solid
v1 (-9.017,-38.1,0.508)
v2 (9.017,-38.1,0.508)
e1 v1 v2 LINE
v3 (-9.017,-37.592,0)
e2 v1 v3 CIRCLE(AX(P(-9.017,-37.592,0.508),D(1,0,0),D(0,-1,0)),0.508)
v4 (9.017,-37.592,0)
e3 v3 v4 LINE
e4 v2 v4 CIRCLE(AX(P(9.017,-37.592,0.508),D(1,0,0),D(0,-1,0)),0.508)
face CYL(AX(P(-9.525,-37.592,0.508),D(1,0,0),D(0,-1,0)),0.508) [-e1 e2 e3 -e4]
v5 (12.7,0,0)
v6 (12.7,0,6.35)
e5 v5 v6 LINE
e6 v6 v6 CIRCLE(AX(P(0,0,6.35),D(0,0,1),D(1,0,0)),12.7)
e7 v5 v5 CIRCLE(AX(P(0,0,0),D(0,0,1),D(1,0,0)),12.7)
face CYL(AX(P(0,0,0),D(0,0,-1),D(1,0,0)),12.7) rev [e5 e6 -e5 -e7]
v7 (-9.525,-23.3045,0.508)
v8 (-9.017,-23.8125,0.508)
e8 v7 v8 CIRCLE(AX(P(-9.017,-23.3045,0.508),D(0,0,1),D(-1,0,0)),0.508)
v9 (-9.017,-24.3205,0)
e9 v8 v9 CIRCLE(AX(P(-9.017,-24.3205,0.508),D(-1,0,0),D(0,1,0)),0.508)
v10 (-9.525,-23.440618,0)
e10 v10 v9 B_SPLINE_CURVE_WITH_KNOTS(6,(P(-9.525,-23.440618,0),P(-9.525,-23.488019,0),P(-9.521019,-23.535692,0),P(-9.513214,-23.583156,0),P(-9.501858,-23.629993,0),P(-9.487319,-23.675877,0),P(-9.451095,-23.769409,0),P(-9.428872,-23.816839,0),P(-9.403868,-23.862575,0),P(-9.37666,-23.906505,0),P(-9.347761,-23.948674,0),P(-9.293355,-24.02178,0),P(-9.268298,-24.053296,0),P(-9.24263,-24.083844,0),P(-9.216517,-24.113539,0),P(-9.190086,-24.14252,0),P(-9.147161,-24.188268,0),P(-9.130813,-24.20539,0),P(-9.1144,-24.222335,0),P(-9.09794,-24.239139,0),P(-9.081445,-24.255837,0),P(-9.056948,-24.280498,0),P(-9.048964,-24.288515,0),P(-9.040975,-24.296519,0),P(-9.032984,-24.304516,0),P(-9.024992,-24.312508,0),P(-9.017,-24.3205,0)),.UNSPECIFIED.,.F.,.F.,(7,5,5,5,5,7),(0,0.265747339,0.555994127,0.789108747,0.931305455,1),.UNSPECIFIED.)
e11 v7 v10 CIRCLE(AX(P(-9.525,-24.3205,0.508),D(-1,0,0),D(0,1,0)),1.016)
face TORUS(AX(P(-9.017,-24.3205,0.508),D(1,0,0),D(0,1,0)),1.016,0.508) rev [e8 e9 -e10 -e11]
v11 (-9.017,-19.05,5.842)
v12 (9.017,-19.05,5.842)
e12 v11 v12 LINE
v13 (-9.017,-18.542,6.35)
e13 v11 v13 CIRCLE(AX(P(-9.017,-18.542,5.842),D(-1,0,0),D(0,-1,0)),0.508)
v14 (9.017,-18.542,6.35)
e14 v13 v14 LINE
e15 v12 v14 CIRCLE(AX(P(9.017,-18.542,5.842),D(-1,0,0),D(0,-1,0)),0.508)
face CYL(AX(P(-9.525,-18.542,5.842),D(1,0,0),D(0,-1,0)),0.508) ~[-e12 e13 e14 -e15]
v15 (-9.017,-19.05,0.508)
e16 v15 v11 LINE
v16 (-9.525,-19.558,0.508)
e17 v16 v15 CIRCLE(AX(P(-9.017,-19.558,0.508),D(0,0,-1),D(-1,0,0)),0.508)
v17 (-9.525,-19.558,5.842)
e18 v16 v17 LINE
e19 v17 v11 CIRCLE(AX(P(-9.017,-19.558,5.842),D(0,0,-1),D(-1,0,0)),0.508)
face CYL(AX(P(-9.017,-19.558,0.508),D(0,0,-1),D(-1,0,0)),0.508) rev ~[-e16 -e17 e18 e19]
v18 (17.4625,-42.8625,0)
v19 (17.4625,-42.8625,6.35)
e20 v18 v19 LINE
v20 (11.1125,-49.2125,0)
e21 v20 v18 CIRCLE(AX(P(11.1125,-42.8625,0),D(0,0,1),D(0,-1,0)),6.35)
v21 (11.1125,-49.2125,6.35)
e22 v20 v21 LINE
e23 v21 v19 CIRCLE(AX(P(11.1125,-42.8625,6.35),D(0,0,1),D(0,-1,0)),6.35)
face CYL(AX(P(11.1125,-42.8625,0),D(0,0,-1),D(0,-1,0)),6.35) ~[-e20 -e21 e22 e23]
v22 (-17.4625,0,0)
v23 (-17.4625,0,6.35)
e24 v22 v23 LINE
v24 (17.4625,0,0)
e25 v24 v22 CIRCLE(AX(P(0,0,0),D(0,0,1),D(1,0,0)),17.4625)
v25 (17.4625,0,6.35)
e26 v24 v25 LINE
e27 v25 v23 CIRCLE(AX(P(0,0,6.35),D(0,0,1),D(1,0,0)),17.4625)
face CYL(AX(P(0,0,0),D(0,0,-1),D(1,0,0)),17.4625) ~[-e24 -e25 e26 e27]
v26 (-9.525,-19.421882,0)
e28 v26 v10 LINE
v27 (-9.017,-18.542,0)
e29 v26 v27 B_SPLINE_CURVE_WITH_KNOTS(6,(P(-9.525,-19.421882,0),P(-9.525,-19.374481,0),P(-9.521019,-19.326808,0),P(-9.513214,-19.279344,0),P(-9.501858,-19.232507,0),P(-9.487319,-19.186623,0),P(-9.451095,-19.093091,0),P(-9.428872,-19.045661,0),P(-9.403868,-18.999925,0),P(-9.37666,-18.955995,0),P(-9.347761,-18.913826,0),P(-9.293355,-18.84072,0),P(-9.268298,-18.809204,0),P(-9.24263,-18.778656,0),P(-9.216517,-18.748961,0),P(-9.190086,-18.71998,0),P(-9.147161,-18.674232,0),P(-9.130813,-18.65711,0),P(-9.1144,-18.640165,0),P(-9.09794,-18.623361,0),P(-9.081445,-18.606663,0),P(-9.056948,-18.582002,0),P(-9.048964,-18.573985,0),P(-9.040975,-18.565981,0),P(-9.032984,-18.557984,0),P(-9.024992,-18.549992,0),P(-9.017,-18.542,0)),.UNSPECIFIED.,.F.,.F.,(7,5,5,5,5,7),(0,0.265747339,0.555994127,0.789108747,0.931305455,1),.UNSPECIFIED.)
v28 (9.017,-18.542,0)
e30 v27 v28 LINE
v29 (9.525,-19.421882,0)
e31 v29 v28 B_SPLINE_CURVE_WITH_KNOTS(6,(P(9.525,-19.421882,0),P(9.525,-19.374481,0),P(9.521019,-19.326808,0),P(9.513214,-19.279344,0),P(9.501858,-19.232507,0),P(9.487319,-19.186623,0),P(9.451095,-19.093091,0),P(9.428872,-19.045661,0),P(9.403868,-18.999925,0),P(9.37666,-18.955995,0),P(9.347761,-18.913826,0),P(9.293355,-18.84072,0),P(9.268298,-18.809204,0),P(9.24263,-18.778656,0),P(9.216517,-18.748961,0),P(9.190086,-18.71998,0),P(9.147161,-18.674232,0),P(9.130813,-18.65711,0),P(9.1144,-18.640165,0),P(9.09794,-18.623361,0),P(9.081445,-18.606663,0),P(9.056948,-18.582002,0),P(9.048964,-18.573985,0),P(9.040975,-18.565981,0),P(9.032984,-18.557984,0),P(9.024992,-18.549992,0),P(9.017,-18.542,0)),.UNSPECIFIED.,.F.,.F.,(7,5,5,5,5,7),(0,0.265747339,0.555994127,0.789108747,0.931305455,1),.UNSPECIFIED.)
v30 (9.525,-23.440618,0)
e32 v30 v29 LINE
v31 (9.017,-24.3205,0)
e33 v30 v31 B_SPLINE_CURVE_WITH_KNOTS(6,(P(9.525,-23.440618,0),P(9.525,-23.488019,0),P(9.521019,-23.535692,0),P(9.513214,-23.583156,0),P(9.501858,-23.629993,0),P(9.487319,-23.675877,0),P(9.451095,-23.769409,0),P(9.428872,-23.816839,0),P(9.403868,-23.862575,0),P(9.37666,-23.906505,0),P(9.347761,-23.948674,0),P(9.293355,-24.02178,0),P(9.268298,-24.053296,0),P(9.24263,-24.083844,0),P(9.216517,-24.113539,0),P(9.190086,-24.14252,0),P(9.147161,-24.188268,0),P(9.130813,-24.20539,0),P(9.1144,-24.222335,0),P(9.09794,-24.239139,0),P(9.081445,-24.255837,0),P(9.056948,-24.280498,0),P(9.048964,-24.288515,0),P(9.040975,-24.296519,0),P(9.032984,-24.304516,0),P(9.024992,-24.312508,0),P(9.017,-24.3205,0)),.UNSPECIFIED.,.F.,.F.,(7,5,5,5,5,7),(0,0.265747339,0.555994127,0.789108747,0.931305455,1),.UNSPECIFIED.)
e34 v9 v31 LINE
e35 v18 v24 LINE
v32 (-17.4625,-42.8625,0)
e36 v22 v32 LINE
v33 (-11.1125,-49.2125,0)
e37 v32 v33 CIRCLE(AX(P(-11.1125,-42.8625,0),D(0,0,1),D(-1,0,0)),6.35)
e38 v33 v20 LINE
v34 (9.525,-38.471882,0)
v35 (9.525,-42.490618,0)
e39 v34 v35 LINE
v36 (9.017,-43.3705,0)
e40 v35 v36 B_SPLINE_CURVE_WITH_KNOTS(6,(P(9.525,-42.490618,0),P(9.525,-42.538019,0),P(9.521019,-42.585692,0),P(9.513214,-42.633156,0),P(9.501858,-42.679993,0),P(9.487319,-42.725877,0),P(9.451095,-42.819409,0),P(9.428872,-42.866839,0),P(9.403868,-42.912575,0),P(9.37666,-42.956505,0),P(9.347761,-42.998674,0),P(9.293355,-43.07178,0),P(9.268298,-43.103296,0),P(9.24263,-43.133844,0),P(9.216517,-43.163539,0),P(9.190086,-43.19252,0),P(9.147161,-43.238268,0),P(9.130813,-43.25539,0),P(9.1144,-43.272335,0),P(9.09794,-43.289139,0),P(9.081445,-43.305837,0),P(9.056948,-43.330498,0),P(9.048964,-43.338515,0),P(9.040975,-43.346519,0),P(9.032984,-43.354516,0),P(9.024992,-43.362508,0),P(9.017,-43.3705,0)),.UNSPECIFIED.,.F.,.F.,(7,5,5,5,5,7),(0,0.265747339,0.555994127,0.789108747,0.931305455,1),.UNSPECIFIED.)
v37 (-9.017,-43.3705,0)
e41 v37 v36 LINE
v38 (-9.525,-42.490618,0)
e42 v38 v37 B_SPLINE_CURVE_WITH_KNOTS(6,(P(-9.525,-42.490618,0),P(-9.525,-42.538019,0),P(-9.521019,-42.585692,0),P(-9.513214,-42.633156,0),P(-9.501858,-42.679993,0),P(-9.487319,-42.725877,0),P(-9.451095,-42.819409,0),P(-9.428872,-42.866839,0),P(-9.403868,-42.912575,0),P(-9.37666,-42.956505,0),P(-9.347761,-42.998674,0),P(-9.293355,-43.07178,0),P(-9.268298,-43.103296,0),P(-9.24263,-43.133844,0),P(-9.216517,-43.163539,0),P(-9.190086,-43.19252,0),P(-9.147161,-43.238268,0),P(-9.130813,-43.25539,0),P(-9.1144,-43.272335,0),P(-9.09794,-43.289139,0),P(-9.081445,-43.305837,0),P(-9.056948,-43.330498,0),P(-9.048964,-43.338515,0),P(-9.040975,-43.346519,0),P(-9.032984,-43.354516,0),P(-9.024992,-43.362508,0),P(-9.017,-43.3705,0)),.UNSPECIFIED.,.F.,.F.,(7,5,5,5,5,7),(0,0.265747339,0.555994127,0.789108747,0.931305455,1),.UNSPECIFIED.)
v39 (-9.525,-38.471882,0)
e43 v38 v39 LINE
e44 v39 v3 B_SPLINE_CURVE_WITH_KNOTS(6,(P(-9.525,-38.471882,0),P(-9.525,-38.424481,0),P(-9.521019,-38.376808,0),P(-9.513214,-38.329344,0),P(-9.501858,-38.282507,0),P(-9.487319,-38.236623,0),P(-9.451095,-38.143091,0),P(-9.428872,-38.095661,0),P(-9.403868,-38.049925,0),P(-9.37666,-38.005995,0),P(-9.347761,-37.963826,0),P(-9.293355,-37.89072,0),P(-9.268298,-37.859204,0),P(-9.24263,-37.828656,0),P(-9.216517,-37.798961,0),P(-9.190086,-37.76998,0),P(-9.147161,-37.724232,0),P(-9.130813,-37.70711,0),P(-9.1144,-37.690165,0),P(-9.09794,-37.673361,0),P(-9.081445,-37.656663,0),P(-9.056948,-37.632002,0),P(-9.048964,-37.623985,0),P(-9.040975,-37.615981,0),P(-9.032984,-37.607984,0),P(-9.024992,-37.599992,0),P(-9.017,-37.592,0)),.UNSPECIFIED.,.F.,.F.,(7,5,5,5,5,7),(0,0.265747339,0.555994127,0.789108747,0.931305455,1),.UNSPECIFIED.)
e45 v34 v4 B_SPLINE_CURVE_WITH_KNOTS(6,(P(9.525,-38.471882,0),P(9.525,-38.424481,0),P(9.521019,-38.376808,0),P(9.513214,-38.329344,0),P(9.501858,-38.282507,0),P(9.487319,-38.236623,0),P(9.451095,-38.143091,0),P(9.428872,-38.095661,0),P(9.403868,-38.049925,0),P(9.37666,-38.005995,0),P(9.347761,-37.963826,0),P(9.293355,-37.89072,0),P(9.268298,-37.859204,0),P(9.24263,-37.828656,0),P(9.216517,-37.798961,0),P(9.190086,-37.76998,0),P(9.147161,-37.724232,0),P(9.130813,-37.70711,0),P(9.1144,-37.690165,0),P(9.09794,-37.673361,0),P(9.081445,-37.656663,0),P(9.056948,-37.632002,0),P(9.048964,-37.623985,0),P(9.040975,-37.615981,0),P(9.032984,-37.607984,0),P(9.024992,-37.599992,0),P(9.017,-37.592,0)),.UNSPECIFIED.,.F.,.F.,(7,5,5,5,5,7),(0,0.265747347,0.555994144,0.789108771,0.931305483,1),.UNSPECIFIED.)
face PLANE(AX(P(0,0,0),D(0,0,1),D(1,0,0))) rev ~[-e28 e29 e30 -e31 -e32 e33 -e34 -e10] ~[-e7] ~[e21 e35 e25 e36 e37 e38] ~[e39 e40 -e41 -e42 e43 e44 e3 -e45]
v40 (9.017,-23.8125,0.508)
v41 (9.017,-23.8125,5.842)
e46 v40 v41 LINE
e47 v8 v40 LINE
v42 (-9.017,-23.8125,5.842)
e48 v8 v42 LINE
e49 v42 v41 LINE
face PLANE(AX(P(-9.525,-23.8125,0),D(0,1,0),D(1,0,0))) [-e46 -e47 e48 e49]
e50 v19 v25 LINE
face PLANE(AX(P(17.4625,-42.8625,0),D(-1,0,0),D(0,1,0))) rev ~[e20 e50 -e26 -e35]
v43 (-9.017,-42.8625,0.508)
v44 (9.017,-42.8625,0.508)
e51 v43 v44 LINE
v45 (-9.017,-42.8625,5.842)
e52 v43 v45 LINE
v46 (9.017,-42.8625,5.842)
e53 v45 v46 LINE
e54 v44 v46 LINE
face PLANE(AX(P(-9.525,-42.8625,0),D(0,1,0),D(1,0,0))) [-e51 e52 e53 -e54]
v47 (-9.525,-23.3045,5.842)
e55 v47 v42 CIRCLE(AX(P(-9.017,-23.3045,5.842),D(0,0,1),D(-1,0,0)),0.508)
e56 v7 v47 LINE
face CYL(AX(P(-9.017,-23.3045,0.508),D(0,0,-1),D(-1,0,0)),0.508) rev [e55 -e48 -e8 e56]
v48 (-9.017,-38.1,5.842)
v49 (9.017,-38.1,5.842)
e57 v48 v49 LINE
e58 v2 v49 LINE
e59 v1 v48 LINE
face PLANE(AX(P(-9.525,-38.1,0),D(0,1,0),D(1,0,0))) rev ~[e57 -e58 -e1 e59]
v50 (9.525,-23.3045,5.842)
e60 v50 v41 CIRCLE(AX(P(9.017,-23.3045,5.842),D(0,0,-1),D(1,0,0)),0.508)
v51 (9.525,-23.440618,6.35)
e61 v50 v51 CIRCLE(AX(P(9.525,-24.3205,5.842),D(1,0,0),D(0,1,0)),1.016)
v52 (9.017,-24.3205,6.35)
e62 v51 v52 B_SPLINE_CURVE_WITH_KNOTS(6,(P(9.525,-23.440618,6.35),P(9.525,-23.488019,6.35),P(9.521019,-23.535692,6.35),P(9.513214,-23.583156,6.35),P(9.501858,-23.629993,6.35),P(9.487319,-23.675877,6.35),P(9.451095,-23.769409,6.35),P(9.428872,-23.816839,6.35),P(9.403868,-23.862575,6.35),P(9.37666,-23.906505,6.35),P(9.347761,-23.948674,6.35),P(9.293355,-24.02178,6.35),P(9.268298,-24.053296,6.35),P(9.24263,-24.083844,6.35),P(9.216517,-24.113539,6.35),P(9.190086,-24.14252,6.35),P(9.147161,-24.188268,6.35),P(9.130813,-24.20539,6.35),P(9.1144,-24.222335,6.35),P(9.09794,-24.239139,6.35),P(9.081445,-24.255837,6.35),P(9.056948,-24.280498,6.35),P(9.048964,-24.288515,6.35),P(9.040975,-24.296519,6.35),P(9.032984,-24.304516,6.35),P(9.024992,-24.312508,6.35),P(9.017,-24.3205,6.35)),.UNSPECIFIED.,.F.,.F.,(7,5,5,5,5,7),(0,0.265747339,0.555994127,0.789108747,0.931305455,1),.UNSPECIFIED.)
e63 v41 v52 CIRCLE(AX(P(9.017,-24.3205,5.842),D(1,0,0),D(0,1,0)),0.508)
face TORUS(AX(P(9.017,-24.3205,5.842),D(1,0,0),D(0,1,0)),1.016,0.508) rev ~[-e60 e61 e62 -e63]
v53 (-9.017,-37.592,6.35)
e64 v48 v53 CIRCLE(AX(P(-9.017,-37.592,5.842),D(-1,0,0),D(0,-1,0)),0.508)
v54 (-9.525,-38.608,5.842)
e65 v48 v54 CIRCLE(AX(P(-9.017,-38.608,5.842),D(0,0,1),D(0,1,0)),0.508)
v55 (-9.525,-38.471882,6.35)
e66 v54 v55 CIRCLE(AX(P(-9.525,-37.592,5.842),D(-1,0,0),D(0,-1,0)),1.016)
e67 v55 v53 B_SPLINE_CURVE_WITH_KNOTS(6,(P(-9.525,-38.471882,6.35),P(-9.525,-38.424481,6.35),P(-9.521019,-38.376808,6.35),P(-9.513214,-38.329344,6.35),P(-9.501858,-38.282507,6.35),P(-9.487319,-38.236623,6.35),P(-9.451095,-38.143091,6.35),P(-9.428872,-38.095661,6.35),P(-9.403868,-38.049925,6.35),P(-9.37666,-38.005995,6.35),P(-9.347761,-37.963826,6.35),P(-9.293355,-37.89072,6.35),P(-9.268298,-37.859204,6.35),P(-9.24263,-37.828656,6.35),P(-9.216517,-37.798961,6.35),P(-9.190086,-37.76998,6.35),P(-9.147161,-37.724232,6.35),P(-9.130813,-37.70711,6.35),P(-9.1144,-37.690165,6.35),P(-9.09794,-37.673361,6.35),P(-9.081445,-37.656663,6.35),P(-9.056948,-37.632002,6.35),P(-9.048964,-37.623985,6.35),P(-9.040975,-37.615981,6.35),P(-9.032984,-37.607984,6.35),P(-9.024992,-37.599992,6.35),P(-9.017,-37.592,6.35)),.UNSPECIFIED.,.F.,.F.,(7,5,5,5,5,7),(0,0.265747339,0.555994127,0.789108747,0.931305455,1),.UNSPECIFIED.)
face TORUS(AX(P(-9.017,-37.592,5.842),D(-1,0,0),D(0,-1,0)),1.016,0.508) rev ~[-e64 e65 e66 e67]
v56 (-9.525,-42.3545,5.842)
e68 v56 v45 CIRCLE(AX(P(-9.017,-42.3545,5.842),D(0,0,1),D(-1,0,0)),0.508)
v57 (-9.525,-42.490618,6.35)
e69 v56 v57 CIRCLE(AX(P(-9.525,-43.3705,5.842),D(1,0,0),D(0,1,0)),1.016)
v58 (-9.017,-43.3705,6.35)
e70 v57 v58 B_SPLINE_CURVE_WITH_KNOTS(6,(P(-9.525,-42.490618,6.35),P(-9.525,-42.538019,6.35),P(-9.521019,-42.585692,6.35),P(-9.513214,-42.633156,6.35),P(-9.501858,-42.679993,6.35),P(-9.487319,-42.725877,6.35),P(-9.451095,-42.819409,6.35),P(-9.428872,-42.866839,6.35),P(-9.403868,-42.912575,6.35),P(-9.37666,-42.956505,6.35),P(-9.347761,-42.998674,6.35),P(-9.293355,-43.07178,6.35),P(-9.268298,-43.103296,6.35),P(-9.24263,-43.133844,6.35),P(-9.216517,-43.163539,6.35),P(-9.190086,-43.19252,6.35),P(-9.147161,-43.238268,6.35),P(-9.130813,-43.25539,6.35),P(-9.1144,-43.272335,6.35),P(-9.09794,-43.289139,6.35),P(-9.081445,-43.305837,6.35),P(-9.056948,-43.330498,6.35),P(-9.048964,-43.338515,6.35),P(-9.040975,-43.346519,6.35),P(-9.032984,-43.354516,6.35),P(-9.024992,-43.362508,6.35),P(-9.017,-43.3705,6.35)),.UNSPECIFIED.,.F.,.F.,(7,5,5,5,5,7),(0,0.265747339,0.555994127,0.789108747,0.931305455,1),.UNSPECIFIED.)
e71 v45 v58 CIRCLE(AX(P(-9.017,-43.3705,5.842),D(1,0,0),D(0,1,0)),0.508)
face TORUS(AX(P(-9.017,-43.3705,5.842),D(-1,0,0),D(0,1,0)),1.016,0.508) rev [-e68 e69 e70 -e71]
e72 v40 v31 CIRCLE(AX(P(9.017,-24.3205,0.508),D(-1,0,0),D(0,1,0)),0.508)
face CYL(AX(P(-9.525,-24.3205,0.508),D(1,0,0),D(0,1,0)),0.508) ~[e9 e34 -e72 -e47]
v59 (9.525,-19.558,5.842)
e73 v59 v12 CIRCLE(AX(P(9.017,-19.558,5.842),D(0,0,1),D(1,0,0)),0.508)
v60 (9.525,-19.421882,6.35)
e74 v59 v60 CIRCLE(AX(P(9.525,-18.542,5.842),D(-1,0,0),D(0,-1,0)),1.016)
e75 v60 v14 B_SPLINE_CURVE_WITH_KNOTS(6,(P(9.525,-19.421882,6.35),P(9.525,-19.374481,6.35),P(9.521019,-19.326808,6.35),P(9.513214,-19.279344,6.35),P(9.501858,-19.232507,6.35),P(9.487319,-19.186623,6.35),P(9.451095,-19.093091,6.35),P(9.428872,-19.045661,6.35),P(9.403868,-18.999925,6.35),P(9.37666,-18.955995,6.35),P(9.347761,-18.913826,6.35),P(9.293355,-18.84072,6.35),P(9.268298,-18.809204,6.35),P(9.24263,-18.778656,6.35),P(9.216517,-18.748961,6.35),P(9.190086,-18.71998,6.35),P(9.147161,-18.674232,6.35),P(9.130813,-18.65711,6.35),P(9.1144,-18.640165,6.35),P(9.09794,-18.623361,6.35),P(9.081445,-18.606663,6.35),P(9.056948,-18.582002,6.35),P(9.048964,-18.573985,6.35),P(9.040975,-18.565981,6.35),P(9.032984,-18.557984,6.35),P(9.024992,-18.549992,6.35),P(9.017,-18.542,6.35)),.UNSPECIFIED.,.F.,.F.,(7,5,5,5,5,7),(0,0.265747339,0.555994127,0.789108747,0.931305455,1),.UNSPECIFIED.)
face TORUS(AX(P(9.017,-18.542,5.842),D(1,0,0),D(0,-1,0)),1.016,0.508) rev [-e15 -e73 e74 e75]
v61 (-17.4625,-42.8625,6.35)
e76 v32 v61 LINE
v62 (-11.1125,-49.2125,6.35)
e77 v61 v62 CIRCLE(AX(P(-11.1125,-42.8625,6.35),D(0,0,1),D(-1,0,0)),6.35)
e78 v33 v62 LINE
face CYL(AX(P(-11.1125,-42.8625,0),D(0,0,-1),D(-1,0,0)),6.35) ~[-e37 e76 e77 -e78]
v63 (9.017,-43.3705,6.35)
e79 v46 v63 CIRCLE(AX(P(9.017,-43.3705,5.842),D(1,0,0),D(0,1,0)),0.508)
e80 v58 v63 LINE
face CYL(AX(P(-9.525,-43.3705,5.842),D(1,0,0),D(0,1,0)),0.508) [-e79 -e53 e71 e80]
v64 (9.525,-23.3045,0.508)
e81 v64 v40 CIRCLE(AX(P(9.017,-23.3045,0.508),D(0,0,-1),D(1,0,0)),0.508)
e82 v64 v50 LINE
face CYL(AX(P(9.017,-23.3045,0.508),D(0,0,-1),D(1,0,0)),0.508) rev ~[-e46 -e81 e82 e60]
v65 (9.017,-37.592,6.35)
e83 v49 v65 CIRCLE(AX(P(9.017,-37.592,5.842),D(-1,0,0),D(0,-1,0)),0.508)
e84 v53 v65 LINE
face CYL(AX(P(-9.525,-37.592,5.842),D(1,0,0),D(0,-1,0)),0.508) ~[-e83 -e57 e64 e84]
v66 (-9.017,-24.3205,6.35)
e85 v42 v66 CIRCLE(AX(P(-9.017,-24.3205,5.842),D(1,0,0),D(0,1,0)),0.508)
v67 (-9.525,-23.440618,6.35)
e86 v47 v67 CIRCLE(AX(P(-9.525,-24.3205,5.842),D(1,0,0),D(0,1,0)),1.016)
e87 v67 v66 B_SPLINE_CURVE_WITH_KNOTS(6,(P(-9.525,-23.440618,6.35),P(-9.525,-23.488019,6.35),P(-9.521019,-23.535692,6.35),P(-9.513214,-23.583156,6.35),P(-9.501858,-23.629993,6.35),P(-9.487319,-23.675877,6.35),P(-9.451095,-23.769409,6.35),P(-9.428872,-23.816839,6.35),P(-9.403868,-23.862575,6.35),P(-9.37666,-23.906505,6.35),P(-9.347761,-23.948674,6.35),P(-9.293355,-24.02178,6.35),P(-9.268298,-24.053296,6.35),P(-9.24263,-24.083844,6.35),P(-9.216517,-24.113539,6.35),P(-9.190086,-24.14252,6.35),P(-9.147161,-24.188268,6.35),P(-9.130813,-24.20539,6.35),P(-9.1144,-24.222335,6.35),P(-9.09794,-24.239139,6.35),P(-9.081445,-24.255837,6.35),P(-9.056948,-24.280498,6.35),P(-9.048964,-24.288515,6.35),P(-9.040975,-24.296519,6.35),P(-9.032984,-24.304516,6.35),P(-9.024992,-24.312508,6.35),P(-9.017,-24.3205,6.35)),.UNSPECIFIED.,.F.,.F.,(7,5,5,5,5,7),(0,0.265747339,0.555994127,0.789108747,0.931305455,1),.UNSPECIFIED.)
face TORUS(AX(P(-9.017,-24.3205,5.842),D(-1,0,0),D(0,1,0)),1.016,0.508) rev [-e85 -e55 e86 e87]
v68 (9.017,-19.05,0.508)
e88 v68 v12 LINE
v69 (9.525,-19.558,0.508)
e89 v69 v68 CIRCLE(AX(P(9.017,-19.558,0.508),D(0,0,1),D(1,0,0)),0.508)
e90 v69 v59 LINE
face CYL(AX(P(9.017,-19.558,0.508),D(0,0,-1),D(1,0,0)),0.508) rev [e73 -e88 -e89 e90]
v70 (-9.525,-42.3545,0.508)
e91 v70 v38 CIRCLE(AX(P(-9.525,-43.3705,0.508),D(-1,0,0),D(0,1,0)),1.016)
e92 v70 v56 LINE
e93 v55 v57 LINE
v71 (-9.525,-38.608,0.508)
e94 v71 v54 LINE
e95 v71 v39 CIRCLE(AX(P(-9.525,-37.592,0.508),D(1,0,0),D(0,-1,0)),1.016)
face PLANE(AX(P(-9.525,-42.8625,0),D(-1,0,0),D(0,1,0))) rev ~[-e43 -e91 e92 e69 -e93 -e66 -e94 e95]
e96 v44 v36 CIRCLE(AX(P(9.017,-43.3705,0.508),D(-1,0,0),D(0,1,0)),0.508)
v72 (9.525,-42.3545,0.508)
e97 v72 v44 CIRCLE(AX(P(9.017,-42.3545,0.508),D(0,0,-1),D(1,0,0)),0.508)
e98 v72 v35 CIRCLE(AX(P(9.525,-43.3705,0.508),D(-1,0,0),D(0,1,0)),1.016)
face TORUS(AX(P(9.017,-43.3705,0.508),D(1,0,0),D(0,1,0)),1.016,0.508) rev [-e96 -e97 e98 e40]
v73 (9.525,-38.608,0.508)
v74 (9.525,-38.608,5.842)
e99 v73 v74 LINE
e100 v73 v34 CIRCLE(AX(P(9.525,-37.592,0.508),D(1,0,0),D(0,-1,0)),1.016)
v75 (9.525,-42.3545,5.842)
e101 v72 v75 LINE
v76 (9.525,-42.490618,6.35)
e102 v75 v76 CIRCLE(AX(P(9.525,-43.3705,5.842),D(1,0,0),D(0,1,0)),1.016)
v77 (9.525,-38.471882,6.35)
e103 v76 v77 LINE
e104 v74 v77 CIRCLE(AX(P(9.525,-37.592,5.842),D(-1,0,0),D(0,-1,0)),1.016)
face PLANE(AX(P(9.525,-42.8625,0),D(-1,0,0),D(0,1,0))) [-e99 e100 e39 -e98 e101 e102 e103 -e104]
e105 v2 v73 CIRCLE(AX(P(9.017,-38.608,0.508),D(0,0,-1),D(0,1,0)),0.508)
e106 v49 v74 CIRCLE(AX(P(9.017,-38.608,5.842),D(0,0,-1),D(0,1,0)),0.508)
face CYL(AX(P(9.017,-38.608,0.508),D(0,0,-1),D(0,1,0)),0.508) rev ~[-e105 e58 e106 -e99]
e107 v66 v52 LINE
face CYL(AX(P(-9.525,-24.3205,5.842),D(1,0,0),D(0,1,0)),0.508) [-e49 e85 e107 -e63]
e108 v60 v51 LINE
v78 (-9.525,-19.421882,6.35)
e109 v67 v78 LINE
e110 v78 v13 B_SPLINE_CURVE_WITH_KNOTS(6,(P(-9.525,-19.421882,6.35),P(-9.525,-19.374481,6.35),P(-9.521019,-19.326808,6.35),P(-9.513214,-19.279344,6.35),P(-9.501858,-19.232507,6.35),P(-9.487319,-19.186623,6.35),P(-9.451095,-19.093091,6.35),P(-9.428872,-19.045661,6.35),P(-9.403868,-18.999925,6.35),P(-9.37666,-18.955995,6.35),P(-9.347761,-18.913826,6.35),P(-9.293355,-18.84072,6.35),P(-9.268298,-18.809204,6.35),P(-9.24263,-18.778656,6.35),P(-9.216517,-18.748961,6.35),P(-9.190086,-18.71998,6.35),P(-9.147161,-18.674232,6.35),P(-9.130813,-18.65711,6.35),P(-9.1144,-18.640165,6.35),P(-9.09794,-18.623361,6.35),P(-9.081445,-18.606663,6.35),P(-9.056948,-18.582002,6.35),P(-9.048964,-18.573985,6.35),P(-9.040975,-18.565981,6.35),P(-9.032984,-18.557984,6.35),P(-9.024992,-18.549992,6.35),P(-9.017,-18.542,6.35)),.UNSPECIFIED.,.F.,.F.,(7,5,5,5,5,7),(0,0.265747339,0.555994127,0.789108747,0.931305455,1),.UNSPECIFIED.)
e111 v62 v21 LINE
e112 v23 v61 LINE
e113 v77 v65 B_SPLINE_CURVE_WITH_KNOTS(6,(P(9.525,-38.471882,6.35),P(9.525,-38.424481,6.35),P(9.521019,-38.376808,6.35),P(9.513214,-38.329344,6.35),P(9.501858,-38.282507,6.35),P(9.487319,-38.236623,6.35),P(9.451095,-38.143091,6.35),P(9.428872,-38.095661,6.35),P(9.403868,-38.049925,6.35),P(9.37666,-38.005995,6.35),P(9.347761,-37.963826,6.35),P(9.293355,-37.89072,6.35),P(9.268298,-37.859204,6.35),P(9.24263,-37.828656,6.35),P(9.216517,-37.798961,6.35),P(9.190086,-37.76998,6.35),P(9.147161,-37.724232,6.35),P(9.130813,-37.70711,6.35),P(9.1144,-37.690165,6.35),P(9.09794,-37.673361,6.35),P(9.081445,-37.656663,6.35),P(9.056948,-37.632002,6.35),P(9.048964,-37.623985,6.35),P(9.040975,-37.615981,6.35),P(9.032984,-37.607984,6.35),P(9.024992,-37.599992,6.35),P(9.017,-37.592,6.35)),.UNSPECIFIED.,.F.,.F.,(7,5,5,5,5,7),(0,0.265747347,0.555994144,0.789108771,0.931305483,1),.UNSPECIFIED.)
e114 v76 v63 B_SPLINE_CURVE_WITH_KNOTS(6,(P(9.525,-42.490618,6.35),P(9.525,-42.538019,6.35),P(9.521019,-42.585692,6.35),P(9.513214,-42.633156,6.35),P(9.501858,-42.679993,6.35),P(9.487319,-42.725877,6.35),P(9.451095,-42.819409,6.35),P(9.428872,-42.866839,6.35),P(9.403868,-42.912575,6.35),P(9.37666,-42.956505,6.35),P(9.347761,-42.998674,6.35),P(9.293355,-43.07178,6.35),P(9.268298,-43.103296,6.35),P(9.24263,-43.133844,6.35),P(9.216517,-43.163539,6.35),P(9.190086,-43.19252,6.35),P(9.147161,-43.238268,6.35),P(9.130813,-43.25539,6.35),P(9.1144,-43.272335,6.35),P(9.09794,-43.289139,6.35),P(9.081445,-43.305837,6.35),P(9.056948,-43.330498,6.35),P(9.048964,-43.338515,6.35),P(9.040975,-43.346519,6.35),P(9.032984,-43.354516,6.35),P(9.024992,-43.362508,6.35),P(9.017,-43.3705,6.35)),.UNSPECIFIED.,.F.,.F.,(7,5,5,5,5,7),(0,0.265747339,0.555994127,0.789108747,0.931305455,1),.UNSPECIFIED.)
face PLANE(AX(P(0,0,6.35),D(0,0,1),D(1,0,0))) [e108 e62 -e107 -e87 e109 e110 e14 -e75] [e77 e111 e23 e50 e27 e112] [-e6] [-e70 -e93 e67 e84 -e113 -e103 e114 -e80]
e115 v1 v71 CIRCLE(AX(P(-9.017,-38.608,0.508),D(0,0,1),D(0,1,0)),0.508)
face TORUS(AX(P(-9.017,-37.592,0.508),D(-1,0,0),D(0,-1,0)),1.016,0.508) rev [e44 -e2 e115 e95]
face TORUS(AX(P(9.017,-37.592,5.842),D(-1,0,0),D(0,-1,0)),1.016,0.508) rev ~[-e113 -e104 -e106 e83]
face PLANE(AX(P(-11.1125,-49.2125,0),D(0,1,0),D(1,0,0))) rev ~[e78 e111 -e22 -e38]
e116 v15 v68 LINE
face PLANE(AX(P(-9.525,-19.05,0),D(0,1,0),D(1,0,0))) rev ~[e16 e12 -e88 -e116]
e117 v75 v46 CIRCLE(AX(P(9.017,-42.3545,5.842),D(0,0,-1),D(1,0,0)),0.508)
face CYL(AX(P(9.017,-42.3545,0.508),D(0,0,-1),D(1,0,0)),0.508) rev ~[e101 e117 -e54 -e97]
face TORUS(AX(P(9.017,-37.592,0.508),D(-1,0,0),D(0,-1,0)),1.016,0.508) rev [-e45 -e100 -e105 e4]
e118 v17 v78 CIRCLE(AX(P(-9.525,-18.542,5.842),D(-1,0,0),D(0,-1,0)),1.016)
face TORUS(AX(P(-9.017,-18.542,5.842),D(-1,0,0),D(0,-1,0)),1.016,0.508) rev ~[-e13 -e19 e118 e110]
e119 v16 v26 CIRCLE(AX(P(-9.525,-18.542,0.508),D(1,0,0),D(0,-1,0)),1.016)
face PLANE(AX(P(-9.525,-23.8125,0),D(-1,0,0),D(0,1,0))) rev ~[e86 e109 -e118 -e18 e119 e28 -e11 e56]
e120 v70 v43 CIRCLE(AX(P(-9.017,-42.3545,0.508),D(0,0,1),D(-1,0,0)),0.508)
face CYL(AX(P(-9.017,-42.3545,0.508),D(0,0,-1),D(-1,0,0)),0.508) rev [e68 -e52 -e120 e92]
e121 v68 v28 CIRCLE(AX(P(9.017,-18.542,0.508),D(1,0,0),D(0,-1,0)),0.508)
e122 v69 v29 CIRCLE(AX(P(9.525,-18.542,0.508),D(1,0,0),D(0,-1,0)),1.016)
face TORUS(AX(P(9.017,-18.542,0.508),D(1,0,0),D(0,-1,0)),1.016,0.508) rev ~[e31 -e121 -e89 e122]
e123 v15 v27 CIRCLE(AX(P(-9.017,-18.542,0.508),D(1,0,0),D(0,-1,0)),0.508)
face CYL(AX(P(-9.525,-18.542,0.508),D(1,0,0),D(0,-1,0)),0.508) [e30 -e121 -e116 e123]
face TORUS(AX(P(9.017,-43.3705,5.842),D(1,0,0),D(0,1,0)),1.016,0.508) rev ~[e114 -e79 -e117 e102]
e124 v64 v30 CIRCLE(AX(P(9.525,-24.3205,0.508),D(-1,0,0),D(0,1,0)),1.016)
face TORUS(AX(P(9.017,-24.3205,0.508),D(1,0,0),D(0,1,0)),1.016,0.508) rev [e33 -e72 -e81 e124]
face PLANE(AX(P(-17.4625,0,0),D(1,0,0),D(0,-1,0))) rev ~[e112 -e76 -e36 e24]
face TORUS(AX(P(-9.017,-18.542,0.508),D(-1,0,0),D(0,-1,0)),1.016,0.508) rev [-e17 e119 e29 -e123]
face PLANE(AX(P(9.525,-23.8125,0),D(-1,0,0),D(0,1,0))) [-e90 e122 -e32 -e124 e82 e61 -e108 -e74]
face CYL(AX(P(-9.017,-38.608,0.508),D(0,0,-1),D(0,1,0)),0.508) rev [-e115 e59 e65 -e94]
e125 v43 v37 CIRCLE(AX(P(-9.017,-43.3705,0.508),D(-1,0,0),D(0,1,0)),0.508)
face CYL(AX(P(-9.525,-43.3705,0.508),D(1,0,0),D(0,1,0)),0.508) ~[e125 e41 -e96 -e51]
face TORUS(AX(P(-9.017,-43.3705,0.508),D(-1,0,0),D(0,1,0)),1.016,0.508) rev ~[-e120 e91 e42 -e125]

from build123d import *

# Parameters (mm, degrees)
F0_W         = 19.05
F0_H         = 4.7625
F0_R         = 12.7
F1_DEPTH     = 6.35
F2_R         = 0.508
F3_T1_DEPTH  = 5.334
F3_T6_ANGLE  = 233.2969892374
F3_T11_ANGLE = 233.2969892374
F3_T16_ANGLE = 233.2969892374
F3_T21_ANGLE = 233.2969892374
F3_T26_ANGLE = 233.2969892374
F3_T31_ANGLE = 233.2969892374
F3_T36_ANGLE = 233.2969892374
F3_T41_ANGLE = 233.2969892374
F3_T46_ANGLE = 233.2969892374
F3_T51_ANGLE = 233.2969892374
F3_T56_ANGLE = 233.2969892374
F3_T61_ANGLE = 233.2969892374
F3_T66_ANGLE = 233.2969892374
F3_T71_ANGLE = 233.2969892374
F3_T76_ANGLE = 233.2969892374
F3_T81_ANGLE = 233.2969892374


# Not quite as in the source:
# - a fillet or chamfer that OpenCascade refuses, or shapes differently, is made with other operations: its cross-section is extruded or revolved along the edge and cut away or added


with BuildPart() as f1:
    # F0 (on Top) → F1 (new body)
    with BuildSketch(Plane.XY):
        with BuildLine():
            Line((17.4625, -42.8625), (17.4625, 0))
            ThreePointArc((17.4625, 0), (0, 17.4625), (-17.4625, 0))
            Line((-17.4625, 0), (-17.4625, -42.8625))
            ThreePointArc((-17.4625, -42.8625), (-15.6026280605, -47.3526280605), (-11.1125, -49.2125))
            Line((-11.1125, -49.2125), (11.1125, -49.2125))
            ThreePointArc((11.1125, -49.2125), (15.6026280605, -47.3526280605), (17.4625, -42.8625))
        make_face()
        with Locations((0, -40.48125)):
            Rectangle(F0_W, F0_H, mode=Mode.SUBTRACT)
        with Locations((0, -21.43125)):
            Rectangle(F0_W, F0_H, mode=Mode.SUBTRACT)
        Circle(F0_R, mode=Mode.SUBTRACT)
    extrude(amount=F1_DEPTH)

    # F2
    f2_edges = [f1.edges().sort_by_distance(p)[0] for p in [
        (0, -23.8125, 6.35),
        (0, -23.8125, 0),
        (0, -19.05, 6.35),
        (0, -38.1, 6.35),
        (0, -42.8625, 6.35),
        (0, -38.1, 0),
        (0, -19.05, 0),
        (0, -42.8625, 0),
    ]]
    fillet(f2_edges, radius=F2_R)

    # F3: fillet of radius 0.508 on 8 edges, made by hand

    # F3_s2 → F3_t1 (join)
    with BuildSketch(Plane.XY.offset(0.508)):
        with BuildLine():
            ThreePointArc((9.525, -42.3545), (9.3762102448, -42.7137102448), (9.017, -42.8625))
            Line((9.017, -42.8625), (9.525, -42.8625))
            Line((9.525, -42.8625), (9.525, -42.3545))
        make_face()
        with BuildLine():
            ThreePointArc((9.525, -23.3045), (9.3762102448, -23.6637102448), (9.017, -23.8125))
            Line((9.017, -23.8125), (9.525, -23.8125))
            Line((9.525, -23.8125), (9.525, -23.3045))
        make_face()
        with BuildLine():
            ThreePointArc((-9.525, -42.3545), (-9.3762102448, -42.7137102448), (-9.017, -42.8625))
            Line((-9.017, -42.8625), (-9.525, -42.8625))
            Line((-9.525, -42.8625), (-9.525, -42.3545))
        make_face()
        with BuildLine():
            ThreePointArc((9.525, -19.558), (9.3762102448, -19.1987897552), (9.017, -19.05))
            Line((9.017, -19.05), (9.525, -19.05))
            Line((9.525, -19.05), (9.525, -19.558))
        make_face()
        with BuildLine():
            ThreePointArc((-9.525, -19.558), (-9.3762102448, -19.1987897552), (-9.017, -19.05))
            Line((-9.017, -19.05), (-9.525, -19.05))
            Line((-9.525, -19.05), (-9.525, -19.558))
        make_face()
        with BuildLine():
            ThreePointArc((-9.525, -23.3045), (-9.3762102448, -23.6637102448), (-9.017, -23.8125))
            Line((-9.017, -23.8125), (-9.525, -23.8125))
            Line((-9.525, -23.8125), (-9.525, -23.3045))
        make_face()
        with BuildLine():
            ThreePointArc((-9.017, -38.1), (-9.3762102448, -38.2487897552), (-9.525, -38.608))
            Line((-9.525, -38.608), (-9.525, -38.1))
            Line((-9.525, -38.1), (-9.017, -38.1))
        make_face()
        with BuildLine():
            ThreePointArc((9.017, -38.1), (9.3762102448, -38.2487897552), (9.525, -38.608))
            Line((9.525, -38.608), (9.525, -38.1))
            Line((9.525, -38.1), (9.017, -38.1))
        make_face()
    extrude(amount=F3_T1_DEPTH)


with BuildPart() as f3_tool4:
    # F3_s5 → F3_t6 (revolve)
    with BuildSketch(Plane.XY.offset(0.508)):
        with BuildLine():
            ThreePointArc((9.017, -38.1), (9.3762102448, -38.2487897552), (9.525, -38.608))
            Line((9.525, -38.608), (9.525, -38.1))
            Line((9.525, -38.1), (9.017, -38.1))
        make_face()
    revolve(axis=Axis((9.525, -37.592, 0.508), (1, 0, 0)), revolution_arc=F3_T6_ANGLE)

    split(bisect_by=Plane.XY, keep=Keep.TOP)


with BuildPart() as f1_1:
    add(f1.part)

    # F3_t3: union F3_tool4
    add(f3_tool4.part)


with BuildPart() as f3_tool9:
    # F3_s10 → F3_t11 (revolve)
    with BuildSketch(Plane.XY.offset(5.842)):
        with BuildLine():
            ThreePointArc((9.017, -38.1), (9.3762102448, -38.2487897552), (9.525, -38.608))
            Line((9.525, -38.608), (9.525, -38.1))
            Line((9.525, -38.1), (9.017, -38.1))
        make_face()
    revolve(axis=Axis((9.525, -37.592, 5.842), (-1, 0, 0)), revolution_arc=F3_T11_ANGLE)

    split(bisect_by=Plane.XY.offset(6.35), keep=Keep.BOTTOM)


with BuildPart() as f1_2:
    add(f1_1.part)

    # F3_t8: union F3_tool9
    add(f3_tool9.part)


with BuildPart() as f3_tool14:
    # F3_s15 → F3_t16 (revolve)
    with BuildSketch(Plane.XY.offset(0.508)):
        with BuildLine():
            ThreePointArc((-9.525, -38.608), (-9.3762102448, -38.2487897552), (-9.017, -38.1))
            Line((-9.017, -38.1), (-9.525, -38.1))
            Line((-9.525, -38.1), (-9.525, -38.608))
        make_face()
    revolve(axis=Axis((-9.525, -37.592, 0.508), (1, 0, 0)), revolution_arc=F3_T16_ANGLE)

    split(bisect_by=Plane.XY, keep=Keep.TOP)


with BuildPart() as f1_3:
    add(f1_2.part)

    # F3_t13: union F3_tool14
    add(f3_tool14.part)


with BuildPart() as f3_tool19:
    # F3_s20 → F3_t21 (revolve)
    with BuildSketch(Plane.XY.offset(5.842)):
        with BuildLine():
            ThreePointArc((-9.525, -38.608), (-9.3762102448, -38.2487897552), (-9.017, -38.1))
            Line((-9.017, -38.1), (-9.525, -38.1))
            Line((-9.525, -38.1), (-9.525, -38.608))
        make_face()
    revolve(axis=Axis((-9.525, -37.592, 5.842), (-1, 0, 0)), revolution_arc=F3_T21_ANGLE)

    split(bisect_by=Plane.XY.offset(6.35), keep=Keep.BOTTOM)


with BuildPart() as f1_4:
    add(f1_3.part)

    # F3_t18: union F3_tool19
    add(f3_tool19.part)


with BuildPart() as f3_tool24:
    # F3_s25 → F3_t26 (revolve)
    with BuildSketch(Plane.XY.offset(0.508)):
        with BuildLine():
            ThreePointArc((-9.017, -23.8125), (-9.3762102448, -23.6637102448), (-9.525, -23.3045))
            Line((-9.525, -23.3045), (-9.525, -23.8125))
            Line((-9.525, -23.8125), (-9.017, -23.8125))
        make_face()
    revolve(axis=Axis((-9.525, -24.3205, 0.508), (-1, 0, 0)), revolution_arc=F3_T26_ANGLE)

    split(bisect_by=Plane.XY, keep=Keep.TOP)


with BuildPart() as f1_5:
    add(f1_4.part)

    # F3_t23: union F3_tool24
    add(f3_tool24.part)


with BuildPart() as f3_tool29:
    # F3_s30 → F3_t31 (revolve)
    with BuildSketch(Plane.XY.offset(5.842)):
        with BuildLine():
            ThreePointArc((-9.525, -23.3045), (-9.3762102448, -23.6637102448), (-9.017, -23.8125))
            Line((-9.017, -23.8125), (-9.525, -23.8125))
            Line((-9.525, -23.8125), (-9.525, -23.3045))
        make_face()
    revolve(axis=Axis((-9.525, -24.3205, 5.842), (1, 0, 0)), revolution_arc=F3_T31_ANGLE)

    split(bisect_by=Plane.XY.offset(6.35), keep=Keep.BOTTOM)


with BuildPart() as f1_6:
    add(f1_5.part)

    # F3_t28: union F3_tool29
    add(f3_tool29.part)


with BuildPart() as f3_tool34:
    # F3_s35 → F3_t36 (revolve)
    with BuildSketch(Plane.XY.offset(0.508)):
        with BuildLine():
            ThreePointArc((-9.525, -19.558), (-9.3762102448, -19.1987897552), (-9.017, -19.05))
            Line((-9.017, -19.05), (-9.525, -19.05))
            Line((-9.525, -19.05), (-9.525, -19.558))
        make_face()
    revolve(axis=Axis((-9.525, -18.542, 0.508), (1, 0, 0)), revolution_arc=F3_T36_ANGLE)

    split(bisect_by=Plane.XY, keep=Keep.TOP)


with BuildPart() as f1_7:
    add(f1_6.part)

    # F3_t33: union F3_tool34
    add(f3_tool34.part)


with BuildPart() as f3_tool39:
    # F3_s40 → F3_t41 (revolve)
    with BuildSketch(Plane.XY.offset(5.842)):
        with BuildLine():
            ThreePointArc((-9.525, -19.558), (-9.3762102448, -19.1987897552), (-9.017, -19.05))
            Line((-9.017, -19.05), (-9.525, -19.05))
            Line((-9.525, -19.05), (-9.525, -19.558))
        make_face()
    revolve(axis=Axis((-9.525, -18.542, 5.842), (-1, 0, 0)), revolution_arc=F3_T41_ANGLE)

    split(bisect_by=Plane.XY.offset(6.35), keep=Keep.BOTTOM)


with BuildPart() as f1_8:
    add(f1_7.part)

    # F3_t38: union F3_tool39
    add(f3_tool39.part)


with BuildPart() as f3_tool44:
    # F3_s45 → F3_t46 (revolve)
    with BuildSketch(Plane.XY.offset(0.508)):
        with BuildLine():
            ThreePointArc((9.525, -19.558), (9.3762102448, -19.1987897552), (9.017, -19.05))
            Line((9.017, -19.05), (9.525, -19.05))
            Line((9.525, -19.05), (9.525, -19.558))
        make_face()
    revolve(axis=Axis((9.525, -18.542, 0.508), (1, 0, 0)), revolution_arc=F3_T46_ANGLE)

    split(bisect_by=Plane.XY, keep=Keep.TOP)


with BuildPart() as f1_9:
    add(f1_8.part)

    # F3_t43: union F3_tool44
    add(f3_tool44.part)


with BuildPart() as f3_tool49:
    # F3_s50 → F3_t51 (revolve)
    with BuildSketch(Plane.XY.offset(5.842)):
        with BuildLine():
            ThreePointArc((9.525, -19.558), (9.3762102448, -19.1987897552), (9.017, -19.05))
            Line((9.017, -19.05), (9.525, -19.05))
            Line((9.525, -19.05), (9.525, -19.558))
        make_face()
    revolve(axis=Axis((9.525, -18.542, 5.842), (-1, 0, 0)), revolution_arc=F3_T51_ANGLE)

    split(bisect_by=Plane.XY.offset(6.35), keep=Keep.BOTTOM)


with BuildPart() as f1_10:
    add(f1_9.part)

    # F3_t48: union F3_tool49
    add(f3_tool49.part)


with BuildPart() as f3_tool54:
    # F3_s55 → F3_t56 (revolve)
    with BuildSketch(Plane.XY.offset(0.508)):
        with BuildLine():
            ThreePointArc((-9.525, -42.3545), (-9.3762102448, -42.7137102448), (-9.017, -42.8625))
            Line((-9.017, -42.8625), (-9.525, -42.8625))
            Line((-9.525, -42.8625), (-9.525, -42.3545))
        make_face()
    revolve(axis=Axis((-9.525, -43.3705, 0.508), (-1, 0, 0)), revolution_arc=F3_T56_ANGLE)

    split(bisect_by=Plane.XY, keep=Keep.TOP)


with BuildPart() as f1_11:
    add(f1_10.part)

    # F3_t53: union F3_tool54
    add(f3_tool54.part)


with BuildPart() as f3_tool59:
    # F3_s60 → F3_t61 (revolve)
    with BuildSketch(Plane.XY.offset(5.842)):
        with BuildLine():
            ThreePointArc((-9.525, -42.3545), (-9.3762102448, -42.7137102448), (-9.017, -42.8625))
            Line((-9.017, -42.8625), (-9.525, -42.8625))
            Line((-9.525, -42.8625), (-9.525, -42.3545))
        make_face()
    revolve(axis=Axis((-9.525, -43.3705, 5.842), (1, 0, 0)), revolution_arc=F3_T61_ANGLE)

    split(bisect_by=Plane.XY.offset(6.35), keep=Keep.BOTTOM)


with BuildPart() as f1_12:
    add(f1_11.part)

    # F3_t58: union F3_tool59
    add(f3_tool59.part)


with BuildPart() as f3_tool64:
    # F3_s65 → F3_t66 (revolve)
    with BuildSketch(Plane.XY.offset(0.508)):
        with BuildLine():
            ThreePointArc((9.525, -23.3045), (9.3762102448, -23.6637102448), (9.017, -23.8125))
            Line((9.017, -23.8125), (9.525, -23.8125))
            Line((9.525, -23.8125), (9.525, -23.3045))
        make_face()
    revolve(axis=Axis((9.525, -24.3205, 0.508), (-1, 0, 0)), revolution_arc=F3_T66_ANGLE)

    split(bisect_by=Plane.XY, keep=Keep.TOP)


with BuildPart() as f1_13:
    add(f1_12.part)

    # F3_t63: union F3_tool64
    add(f3_tool64.part)


with BuildPart() as f3_tool69:
    # F3_s70 → F3_t71 (revolve)
    with BuildSketch(Plane.XY.offset(5.842)):
        with BuildLine():
            ThreePointArc((9.525, -23.3045), (9.3762102448, -23.6637102448), (9.017, -23.8125))
            Line((9.017, -23.8125), (9.525, -23.8125))
            Line((9.525, -23.8125), (9.525, -23.3045))
        make_face()
    revolve(axis=Axis((9.525, -24.3205, 5.842), (1, 0, 0)), revolution_arc=F3_T71_ANGLE)

    split(bisect_by=Plane.XY.offset(6.35), keep=Keep.BOTTOM)


with BuildPart() as f1_14:
    add(f1_13.part)

    # F3_t68: union F3_tool69
    add(f3_tool69.part)


with BuildPart() as f3_tool74:
    # F3_s75 → F3_t76 (revolve)
    with BuildSketch(Plane.XY.offset(0.508)):
        with BuildLine():
            ThreePointArc((9.525, -42.3545), (9.3762102448, -42.7137102448), (9.017, -42.8625))
            Line((9.017, -42.8625), (9.525, -42.8625))
            Line((9.525, -42.8625), (9.525, -42.3545))
        make_face()
    revolve(axis=Axis((9.525, -43.3705, 0.508), (-1, 0, 0)), revolution_arc=F3_T76_ANGLE)

    split(bisect_by=Plane.XY, keep=Keep.TOP)


with BuildPart() as f1_15:
    add(f1_14.part)

    # F3_t73: union F3_tool74
    add(f3_tool74.part)


with BuildPart() as f3_tool79:
    # F3_s80 → F3_t81 (revolve)
    with BuildSketch(Plane.XY.offset(5.842)):
        with BuildLine():
            ThreePointArc((9.525, -42.3545), (9.3762102448, -42.7137102448), (9.017, -42.8625))
            Line((9.017, -42.8625), (9.525, -42.8625))
            Line((9.525, -42.8625), (9.525, -42.3545))
        make_face()
    revolve(axis=Axis((9.525, -43.3705, 5.842), (1, 0, 0)), revolution_arc=F3_T81_ANGLE)

    split(bisect_by=Plane.XY.offset(6.35), keep=Keep.BOTTOM)


with BuildPart() as f1_16:
    add(f1_15.part)

    # F3_t78: union F3_tool79
    add(f3_tool79.part)


solid = f1_16.part
